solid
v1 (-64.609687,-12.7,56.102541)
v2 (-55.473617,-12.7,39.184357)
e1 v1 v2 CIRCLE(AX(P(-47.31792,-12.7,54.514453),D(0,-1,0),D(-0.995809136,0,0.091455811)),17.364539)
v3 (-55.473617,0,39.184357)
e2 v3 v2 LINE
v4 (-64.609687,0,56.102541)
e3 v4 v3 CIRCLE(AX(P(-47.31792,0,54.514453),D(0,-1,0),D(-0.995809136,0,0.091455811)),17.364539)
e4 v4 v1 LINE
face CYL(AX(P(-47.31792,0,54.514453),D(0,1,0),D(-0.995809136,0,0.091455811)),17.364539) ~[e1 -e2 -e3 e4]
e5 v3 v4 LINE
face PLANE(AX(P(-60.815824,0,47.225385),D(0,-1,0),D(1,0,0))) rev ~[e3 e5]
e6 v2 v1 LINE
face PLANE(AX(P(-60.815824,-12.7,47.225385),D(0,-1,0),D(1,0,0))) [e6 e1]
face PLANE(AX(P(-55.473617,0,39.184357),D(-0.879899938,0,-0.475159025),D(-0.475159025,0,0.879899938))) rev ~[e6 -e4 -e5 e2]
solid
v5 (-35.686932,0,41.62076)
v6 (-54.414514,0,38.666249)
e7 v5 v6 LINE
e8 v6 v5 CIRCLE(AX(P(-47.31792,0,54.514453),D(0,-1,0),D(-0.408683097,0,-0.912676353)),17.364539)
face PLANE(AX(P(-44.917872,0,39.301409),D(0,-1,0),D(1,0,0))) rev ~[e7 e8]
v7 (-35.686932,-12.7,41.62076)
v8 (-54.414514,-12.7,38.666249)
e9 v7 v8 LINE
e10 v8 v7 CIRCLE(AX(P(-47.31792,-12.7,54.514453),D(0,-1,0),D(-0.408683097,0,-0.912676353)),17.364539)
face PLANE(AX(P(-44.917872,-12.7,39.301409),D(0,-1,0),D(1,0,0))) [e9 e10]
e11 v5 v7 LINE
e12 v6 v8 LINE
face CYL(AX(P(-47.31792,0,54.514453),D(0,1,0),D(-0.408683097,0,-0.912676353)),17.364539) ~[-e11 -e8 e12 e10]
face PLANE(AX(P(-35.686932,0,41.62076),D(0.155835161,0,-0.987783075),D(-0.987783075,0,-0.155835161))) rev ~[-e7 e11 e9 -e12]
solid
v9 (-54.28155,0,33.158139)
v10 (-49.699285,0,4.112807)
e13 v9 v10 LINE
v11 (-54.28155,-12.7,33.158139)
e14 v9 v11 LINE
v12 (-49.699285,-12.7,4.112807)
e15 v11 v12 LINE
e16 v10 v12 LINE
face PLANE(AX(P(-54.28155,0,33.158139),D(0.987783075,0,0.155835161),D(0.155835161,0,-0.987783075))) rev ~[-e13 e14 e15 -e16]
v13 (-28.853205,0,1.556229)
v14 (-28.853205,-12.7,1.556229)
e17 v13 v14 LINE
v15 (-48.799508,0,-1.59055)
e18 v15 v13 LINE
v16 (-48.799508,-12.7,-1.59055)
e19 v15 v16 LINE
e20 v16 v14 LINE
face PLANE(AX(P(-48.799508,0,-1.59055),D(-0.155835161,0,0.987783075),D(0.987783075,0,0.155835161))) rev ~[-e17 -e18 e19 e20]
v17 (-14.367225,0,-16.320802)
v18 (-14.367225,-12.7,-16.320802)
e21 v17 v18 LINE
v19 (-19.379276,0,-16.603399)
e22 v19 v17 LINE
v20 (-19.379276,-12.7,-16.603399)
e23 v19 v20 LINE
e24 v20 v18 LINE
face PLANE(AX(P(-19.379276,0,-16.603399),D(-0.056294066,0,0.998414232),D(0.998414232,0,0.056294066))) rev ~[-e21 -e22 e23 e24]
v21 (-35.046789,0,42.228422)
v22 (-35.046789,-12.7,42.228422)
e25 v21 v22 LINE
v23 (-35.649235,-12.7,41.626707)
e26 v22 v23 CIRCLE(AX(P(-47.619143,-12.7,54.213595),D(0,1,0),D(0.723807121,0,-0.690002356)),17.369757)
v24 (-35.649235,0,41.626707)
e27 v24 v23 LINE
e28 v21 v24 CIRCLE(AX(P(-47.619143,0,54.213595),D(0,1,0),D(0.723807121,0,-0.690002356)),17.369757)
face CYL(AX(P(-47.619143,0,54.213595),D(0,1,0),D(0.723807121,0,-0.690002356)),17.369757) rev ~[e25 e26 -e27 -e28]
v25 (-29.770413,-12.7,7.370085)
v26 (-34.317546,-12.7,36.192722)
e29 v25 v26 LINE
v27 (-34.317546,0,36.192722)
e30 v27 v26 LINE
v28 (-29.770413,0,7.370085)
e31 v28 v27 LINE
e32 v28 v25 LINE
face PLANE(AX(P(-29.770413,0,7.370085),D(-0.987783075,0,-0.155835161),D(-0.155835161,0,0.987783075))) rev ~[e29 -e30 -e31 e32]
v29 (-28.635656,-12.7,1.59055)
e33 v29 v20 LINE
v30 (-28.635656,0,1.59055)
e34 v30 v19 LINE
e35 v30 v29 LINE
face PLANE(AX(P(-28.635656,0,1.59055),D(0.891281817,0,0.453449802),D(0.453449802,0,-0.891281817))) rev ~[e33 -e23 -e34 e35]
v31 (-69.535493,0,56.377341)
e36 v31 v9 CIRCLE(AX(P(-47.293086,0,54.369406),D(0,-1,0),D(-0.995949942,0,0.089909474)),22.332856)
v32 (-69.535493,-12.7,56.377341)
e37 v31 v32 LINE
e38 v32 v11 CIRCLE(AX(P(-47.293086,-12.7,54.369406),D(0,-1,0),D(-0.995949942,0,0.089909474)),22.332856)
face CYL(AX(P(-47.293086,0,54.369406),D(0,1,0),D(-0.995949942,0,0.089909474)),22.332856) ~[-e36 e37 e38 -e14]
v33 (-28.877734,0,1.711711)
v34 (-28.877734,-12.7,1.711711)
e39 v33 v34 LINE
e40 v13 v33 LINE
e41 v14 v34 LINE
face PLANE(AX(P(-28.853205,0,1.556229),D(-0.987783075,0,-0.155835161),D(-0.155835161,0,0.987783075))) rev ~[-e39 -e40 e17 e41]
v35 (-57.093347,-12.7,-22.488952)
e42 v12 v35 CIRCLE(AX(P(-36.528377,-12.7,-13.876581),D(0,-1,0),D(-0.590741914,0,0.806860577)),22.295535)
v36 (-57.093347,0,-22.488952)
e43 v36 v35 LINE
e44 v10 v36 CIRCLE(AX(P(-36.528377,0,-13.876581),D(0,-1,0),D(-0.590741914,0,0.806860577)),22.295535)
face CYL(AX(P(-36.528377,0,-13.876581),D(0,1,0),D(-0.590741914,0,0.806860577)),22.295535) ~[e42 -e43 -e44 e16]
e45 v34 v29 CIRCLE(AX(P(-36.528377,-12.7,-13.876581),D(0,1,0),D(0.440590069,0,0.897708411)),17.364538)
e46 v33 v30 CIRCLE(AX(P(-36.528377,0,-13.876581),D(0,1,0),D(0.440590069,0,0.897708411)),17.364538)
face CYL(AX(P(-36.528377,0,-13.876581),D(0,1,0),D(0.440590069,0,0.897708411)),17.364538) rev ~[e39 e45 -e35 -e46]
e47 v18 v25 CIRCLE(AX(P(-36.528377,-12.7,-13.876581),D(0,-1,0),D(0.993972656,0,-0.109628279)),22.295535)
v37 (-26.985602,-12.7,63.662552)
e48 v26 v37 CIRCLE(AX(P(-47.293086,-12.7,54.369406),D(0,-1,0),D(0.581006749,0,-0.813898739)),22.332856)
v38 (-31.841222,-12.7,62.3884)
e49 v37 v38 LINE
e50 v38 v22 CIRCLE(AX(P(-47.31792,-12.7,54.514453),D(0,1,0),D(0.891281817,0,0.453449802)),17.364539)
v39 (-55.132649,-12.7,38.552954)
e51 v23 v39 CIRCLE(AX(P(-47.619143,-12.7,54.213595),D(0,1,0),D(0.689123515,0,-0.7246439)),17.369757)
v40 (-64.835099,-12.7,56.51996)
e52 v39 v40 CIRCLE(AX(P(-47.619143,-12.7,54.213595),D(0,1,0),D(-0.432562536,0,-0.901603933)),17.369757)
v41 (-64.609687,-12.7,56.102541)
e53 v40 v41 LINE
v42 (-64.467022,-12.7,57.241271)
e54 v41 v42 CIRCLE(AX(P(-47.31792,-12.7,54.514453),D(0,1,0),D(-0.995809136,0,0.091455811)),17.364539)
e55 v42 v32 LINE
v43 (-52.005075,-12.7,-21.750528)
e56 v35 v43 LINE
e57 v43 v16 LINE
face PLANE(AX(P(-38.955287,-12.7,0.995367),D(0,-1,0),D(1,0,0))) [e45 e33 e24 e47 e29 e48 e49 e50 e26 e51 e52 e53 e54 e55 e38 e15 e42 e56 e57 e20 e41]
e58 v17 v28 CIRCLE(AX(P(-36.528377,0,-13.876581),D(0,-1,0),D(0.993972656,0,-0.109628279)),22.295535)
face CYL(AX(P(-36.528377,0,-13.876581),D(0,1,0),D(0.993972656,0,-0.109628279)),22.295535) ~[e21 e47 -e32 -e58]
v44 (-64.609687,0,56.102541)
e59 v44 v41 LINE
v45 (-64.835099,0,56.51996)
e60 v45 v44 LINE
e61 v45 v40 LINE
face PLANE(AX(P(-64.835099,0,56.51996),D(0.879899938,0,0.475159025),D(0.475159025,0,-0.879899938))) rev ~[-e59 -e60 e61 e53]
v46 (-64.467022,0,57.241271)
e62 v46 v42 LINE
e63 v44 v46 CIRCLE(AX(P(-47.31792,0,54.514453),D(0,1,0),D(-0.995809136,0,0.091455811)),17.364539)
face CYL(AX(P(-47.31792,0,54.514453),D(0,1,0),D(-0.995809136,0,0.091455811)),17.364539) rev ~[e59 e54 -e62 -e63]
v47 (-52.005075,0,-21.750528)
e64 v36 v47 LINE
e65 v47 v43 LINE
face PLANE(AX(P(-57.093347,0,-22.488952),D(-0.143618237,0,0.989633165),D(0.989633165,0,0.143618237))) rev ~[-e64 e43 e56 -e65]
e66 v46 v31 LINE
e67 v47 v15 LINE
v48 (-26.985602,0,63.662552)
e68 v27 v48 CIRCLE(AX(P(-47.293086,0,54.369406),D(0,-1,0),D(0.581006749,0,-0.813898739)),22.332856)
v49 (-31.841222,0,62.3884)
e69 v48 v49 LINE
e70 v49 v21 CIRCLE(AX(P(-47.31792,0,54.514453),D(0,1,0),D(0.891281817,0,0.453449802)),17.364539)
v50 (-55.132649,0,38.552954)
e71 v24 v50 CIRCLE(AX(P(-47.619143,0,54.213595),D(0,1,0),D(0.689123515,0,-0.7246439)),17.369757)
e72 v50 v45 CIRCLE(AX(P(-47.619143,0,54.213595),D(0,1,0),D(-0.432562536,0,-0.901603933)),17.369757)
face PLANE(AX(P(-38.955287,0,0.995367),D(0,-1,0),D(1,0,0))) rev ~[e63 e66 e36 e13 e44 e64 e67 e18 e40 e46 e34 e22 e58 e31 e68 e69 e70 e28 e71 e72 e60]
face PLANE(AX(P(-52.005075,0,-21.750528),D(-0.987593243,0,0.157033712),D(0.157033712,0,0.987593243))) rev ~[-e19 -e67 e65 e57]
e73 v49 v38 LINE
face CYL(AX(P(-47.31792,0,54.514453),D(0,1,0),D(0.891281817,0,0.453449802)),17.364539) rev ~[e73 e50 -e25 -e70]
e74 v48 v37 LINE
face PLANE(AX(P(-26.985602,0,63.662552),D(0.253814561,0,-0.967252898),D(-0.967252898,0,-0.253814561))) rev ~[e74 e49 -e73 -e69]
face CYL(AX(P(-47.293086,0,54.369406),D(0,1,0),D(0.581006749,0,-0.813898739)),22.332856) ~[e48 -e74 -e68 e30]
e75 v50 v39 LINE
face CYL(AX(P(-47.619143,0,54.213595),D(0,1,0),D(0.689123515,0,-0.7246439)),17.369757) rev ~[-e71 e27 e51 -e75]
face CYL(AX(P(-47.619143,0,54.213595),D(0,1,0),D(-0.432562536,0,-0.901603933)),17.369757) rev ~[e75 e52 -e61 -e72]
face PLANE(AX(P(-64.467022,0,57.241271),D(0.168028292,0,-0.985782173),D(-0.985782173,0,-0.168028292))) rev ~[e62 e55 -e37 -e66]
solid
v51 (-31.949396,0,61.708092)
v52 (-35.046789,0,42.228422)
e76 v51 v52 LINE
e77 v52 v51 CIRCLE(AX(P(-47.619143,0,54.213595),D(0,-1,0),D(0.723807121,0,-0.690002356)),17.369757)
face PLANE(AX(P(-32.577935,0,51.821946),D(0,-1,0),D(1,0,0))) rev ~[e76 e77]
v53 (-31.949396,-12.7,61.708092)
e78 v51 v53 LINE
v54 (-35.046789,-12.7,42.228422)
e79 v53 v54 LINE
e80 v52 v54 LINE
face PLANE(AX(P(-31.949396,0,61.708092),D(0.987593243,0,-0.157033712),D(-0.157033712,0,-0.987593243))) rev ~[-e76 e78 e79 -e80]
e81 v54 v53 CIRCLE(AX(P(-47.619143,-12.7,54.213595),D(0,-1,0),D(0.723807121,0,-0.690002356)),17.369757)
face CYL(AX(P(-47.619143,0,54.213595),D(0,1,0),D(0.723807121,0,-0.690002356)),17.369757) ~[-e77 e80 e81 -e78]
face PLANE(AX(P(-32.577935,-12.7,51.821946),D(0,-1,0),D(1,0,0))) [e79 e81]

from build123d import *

# Parameters (mm, degrees)
F1_DEPTH = 12.7


with BuildPart() as f1:
    # F0 (on Front) → F1 (new body)
    with BuildSketch(Plane.XZ):
        with BuildLine():
            Line((-48.7995083992, -1.5905502483), (-28.8532047719, 1.556229154))
            Line((-28.8532047719, 1.556229154), (-28.8777340522, 1.7117114456))
            ThreePointArc((-28.8777340522, 1.7117114456), (-39.3680005528, 3.2542025696), (-48.7995083992, -1.5905502483))
        make_face()
        with BuildLine():
            ThreePointArc((-48.7995083992, -1.5905502483), (-39.3680005528, 3.2542025696), (-28.8777340522, 1.7117114456))
            Line((-28.8777340522, 1.7117114456), (-29.7704133367, 7.3700845868))
            ThreePointArc((-29.7704133367, 7.3700845868), (-40.124753878, 8.1269858394), (-49.6992845111, 4.1128071308))
            Line((-49.6992845111, 4.1128071308), (-48.7995083992, -1.5905502483))
        make_face()
        with BuildLine():
            Line((-29.7704133367, 7.3700845868), (-28.8777340522, 1.7117114456))
            ThreePointArc((-28.8777340522, 1.7117114456), (-28.7564587611, 1.6516025926), (-28.6356556912, 1.5905502483))
            ThreePointArc((-28.6356556912, 1.5905502483), (-21.0516796779, -6.0026344403), (-19.3792761761, -16.6033991491))
            Line((-19.3792761761, -16.6033991491), (-14.3672252335, -16.3208022891))
            ThreePointArc((-14.3672252335, -16.3208022891), (-17.8363108802, -1.7234938217), (-29.7704133367, 7.3700845868))
        make_face()
        with BuildLine():
            ThreePointArc((-52.0050752019, -21.7505278741), (-53.6774787037, -11.1497631653), (-48.7995083992, -1.5905502483))
            Line((-48.7995083992, -1.5905502483), (-49.6992845111, 4.1128071308))
            ThreePointArc((-49.6992845111, 4.1128071308), (-58.0095489431, -7.9058060898), (-57.0933466821, -22.4889515699))
            Line((-57.0933466821, -22.4889515699), (-52.0050752019, -21.7505278741))
        make_face()
        with BuildLine():
            Line((-52.0050752019, -21.7505278741), (-48.7995083992, -1.5905502483))
            ThreePointArc((-48.7995083992, -1.5905502483), (-53.6774787037, -11.1497631653), (-52.0050752019, -21.7505278741))
        make_face()
        with BuildLine():
            ThreePointArc((-19.3792761761, -16.6033991491), (-21.0516796779, -6.0026344403), (-28.6356556912, 1.5905502483))
            Line((-28.6356556912, 1.5905502483), (-19.3792761761, -16.6033991491))
        make_face()
        with BuildLine():
            ThreePointArc((-49.6992845111, 4.1128071308), (-40.124753878, 8.1269858394), (-29.7704133367, 7.3700845868))
            Line((-29.7704133367, 7.3700845868), (-34.3175456617, 36.1927220814))
            ThreePointArc((-34.3175456617, 36.1927220814), (-43.9369802174, 32.2901614466), (-54.2815496204, 33.1581387178))
            Line((-54.2815496204, 33.1581387178), (-49.6992845111, 4.1128071308))
        make_face()
        with BuildLine():
            ThreePointArc((-54.2815496204, 33.1581387178), (-43.9369802174, 32.2901614466), (-34.3175456617, 36.1927220814))
            Line((-34.3175456617, 36.1927220814), (-35.1863457074, 41.6997333097))
            Line((-35.1863457074, 41.6997333097), (-35.6492351188, 41.6267067032))
            ThreePointArc((-35.6492351188, 41.6267067032), (-44.912324279, 37.0560431574), (-55.1326493347, 38.5529539073))
            Line((-55.1326493347, 38.5529539073), (-54.2815496204, 33.1581387178))
        make_face()
        with BuildLine():
            Line((-35.1863457074, 41.6997333097), (-34.3175456617, 36.1927220814))
            ThreePointArc((-34.3175456617, 36.1927220814), (-25.7156020352, 48.6101817009), (-26.9856018058, 63.6625515522))
            Line((-26.9856018058, 63.6625515522), (-31.8412224938, 62.388399532))
            ThreePointArc((-31.8412224938, 62.388399532), (-30.168818992, 51.7876348232), (-35.0467892965, 42.2284219061))
            ThreePointArc((-35.0467892965, 42.2284219061), (-35.3443246218, 41.9238722412), (-35.6492351188, 41.6267067032))
            Line((-35.6492351188, 41.6267067032), (-35.1863457074, 41.6997333097))
        make_face()
        with BuildLine():
            ThreePointArc((-69.5354928411, 56.3773410221), (-65.958395671, 42.107159461), (-54.2815496204, 33.1581387178))
            Line((-54.2815496204, 33.1581387178), (-55.1326493347, 38.5529539073))
            ThreePointArc((-55.1326493347, 38.5529539073), (-62.9027913452, 45.9601983724), (-64.8350992238, 56.5199599082))
            Line((-64.8350992238, 56.5199599082), (-64.6096867091, 56.1025407975))
            ThreePointArc((-64.6096867091, 56.1025407975), (-64.5477640968, 56.6730847269), (-64.4670215196, 57.241270807))
            Line((-64.4670215196, 57.241270807), (-69.5354928411, 56.3773410221))
        make_face()
    extrude(amount=F1_DEPTH)


with BuildPart() as f1b:
    # F0 (on Front) → F1, piece 2 (new body)
    with BuildSketch(Plane.XZ):
        with BuildLine():
            Line((-35.6869321752, 41.62075952), (-54.4145137861, 38.6662487912))
            ThreePointArc((-54.4145137861, 38.6662487912), (-44.611914547, 37.3620552095), (-35.6869321752, 41.62075952))
        make_face()
    extrude(amount=F1_DEPTH)


with BuildPart() as f1c:
    # F0 (on Front) → F1, piece 3 (new body)
    with BuildSketch(Plane.XZ):
        with BuildLine():
            ThreePointArc((-64.6096867091, 56.1025407975), (-62.5969769393, 46.2635354492), (-55.473616533, 39.1843572918))
            Line((-55.473616533, 39.1843572918), (-64.6096867091, 56.1025407975))
        make_face()
    extrude(amount=F1_DEPTH)


with BuildPart() as f1d:
    # F0 (on Front) → F1, piece 4 (new body)
    with BuildSketch(Plane.XZ):
        with BuildLine():
            Line((-31.9493958213, 61.7080918062), (-35.0467892965, 42.2284219061))
            ThreePointArc((-35.0467892965, 42.2284219061), (-30.4648884431, 51.4859577882), (-31.9493958213, 61.7080918062))
        make_face()
    extrude(amount=F1_DEPTH)


solid = Compound([f1.part, f1b.part, f1c.part, f1d.part])
